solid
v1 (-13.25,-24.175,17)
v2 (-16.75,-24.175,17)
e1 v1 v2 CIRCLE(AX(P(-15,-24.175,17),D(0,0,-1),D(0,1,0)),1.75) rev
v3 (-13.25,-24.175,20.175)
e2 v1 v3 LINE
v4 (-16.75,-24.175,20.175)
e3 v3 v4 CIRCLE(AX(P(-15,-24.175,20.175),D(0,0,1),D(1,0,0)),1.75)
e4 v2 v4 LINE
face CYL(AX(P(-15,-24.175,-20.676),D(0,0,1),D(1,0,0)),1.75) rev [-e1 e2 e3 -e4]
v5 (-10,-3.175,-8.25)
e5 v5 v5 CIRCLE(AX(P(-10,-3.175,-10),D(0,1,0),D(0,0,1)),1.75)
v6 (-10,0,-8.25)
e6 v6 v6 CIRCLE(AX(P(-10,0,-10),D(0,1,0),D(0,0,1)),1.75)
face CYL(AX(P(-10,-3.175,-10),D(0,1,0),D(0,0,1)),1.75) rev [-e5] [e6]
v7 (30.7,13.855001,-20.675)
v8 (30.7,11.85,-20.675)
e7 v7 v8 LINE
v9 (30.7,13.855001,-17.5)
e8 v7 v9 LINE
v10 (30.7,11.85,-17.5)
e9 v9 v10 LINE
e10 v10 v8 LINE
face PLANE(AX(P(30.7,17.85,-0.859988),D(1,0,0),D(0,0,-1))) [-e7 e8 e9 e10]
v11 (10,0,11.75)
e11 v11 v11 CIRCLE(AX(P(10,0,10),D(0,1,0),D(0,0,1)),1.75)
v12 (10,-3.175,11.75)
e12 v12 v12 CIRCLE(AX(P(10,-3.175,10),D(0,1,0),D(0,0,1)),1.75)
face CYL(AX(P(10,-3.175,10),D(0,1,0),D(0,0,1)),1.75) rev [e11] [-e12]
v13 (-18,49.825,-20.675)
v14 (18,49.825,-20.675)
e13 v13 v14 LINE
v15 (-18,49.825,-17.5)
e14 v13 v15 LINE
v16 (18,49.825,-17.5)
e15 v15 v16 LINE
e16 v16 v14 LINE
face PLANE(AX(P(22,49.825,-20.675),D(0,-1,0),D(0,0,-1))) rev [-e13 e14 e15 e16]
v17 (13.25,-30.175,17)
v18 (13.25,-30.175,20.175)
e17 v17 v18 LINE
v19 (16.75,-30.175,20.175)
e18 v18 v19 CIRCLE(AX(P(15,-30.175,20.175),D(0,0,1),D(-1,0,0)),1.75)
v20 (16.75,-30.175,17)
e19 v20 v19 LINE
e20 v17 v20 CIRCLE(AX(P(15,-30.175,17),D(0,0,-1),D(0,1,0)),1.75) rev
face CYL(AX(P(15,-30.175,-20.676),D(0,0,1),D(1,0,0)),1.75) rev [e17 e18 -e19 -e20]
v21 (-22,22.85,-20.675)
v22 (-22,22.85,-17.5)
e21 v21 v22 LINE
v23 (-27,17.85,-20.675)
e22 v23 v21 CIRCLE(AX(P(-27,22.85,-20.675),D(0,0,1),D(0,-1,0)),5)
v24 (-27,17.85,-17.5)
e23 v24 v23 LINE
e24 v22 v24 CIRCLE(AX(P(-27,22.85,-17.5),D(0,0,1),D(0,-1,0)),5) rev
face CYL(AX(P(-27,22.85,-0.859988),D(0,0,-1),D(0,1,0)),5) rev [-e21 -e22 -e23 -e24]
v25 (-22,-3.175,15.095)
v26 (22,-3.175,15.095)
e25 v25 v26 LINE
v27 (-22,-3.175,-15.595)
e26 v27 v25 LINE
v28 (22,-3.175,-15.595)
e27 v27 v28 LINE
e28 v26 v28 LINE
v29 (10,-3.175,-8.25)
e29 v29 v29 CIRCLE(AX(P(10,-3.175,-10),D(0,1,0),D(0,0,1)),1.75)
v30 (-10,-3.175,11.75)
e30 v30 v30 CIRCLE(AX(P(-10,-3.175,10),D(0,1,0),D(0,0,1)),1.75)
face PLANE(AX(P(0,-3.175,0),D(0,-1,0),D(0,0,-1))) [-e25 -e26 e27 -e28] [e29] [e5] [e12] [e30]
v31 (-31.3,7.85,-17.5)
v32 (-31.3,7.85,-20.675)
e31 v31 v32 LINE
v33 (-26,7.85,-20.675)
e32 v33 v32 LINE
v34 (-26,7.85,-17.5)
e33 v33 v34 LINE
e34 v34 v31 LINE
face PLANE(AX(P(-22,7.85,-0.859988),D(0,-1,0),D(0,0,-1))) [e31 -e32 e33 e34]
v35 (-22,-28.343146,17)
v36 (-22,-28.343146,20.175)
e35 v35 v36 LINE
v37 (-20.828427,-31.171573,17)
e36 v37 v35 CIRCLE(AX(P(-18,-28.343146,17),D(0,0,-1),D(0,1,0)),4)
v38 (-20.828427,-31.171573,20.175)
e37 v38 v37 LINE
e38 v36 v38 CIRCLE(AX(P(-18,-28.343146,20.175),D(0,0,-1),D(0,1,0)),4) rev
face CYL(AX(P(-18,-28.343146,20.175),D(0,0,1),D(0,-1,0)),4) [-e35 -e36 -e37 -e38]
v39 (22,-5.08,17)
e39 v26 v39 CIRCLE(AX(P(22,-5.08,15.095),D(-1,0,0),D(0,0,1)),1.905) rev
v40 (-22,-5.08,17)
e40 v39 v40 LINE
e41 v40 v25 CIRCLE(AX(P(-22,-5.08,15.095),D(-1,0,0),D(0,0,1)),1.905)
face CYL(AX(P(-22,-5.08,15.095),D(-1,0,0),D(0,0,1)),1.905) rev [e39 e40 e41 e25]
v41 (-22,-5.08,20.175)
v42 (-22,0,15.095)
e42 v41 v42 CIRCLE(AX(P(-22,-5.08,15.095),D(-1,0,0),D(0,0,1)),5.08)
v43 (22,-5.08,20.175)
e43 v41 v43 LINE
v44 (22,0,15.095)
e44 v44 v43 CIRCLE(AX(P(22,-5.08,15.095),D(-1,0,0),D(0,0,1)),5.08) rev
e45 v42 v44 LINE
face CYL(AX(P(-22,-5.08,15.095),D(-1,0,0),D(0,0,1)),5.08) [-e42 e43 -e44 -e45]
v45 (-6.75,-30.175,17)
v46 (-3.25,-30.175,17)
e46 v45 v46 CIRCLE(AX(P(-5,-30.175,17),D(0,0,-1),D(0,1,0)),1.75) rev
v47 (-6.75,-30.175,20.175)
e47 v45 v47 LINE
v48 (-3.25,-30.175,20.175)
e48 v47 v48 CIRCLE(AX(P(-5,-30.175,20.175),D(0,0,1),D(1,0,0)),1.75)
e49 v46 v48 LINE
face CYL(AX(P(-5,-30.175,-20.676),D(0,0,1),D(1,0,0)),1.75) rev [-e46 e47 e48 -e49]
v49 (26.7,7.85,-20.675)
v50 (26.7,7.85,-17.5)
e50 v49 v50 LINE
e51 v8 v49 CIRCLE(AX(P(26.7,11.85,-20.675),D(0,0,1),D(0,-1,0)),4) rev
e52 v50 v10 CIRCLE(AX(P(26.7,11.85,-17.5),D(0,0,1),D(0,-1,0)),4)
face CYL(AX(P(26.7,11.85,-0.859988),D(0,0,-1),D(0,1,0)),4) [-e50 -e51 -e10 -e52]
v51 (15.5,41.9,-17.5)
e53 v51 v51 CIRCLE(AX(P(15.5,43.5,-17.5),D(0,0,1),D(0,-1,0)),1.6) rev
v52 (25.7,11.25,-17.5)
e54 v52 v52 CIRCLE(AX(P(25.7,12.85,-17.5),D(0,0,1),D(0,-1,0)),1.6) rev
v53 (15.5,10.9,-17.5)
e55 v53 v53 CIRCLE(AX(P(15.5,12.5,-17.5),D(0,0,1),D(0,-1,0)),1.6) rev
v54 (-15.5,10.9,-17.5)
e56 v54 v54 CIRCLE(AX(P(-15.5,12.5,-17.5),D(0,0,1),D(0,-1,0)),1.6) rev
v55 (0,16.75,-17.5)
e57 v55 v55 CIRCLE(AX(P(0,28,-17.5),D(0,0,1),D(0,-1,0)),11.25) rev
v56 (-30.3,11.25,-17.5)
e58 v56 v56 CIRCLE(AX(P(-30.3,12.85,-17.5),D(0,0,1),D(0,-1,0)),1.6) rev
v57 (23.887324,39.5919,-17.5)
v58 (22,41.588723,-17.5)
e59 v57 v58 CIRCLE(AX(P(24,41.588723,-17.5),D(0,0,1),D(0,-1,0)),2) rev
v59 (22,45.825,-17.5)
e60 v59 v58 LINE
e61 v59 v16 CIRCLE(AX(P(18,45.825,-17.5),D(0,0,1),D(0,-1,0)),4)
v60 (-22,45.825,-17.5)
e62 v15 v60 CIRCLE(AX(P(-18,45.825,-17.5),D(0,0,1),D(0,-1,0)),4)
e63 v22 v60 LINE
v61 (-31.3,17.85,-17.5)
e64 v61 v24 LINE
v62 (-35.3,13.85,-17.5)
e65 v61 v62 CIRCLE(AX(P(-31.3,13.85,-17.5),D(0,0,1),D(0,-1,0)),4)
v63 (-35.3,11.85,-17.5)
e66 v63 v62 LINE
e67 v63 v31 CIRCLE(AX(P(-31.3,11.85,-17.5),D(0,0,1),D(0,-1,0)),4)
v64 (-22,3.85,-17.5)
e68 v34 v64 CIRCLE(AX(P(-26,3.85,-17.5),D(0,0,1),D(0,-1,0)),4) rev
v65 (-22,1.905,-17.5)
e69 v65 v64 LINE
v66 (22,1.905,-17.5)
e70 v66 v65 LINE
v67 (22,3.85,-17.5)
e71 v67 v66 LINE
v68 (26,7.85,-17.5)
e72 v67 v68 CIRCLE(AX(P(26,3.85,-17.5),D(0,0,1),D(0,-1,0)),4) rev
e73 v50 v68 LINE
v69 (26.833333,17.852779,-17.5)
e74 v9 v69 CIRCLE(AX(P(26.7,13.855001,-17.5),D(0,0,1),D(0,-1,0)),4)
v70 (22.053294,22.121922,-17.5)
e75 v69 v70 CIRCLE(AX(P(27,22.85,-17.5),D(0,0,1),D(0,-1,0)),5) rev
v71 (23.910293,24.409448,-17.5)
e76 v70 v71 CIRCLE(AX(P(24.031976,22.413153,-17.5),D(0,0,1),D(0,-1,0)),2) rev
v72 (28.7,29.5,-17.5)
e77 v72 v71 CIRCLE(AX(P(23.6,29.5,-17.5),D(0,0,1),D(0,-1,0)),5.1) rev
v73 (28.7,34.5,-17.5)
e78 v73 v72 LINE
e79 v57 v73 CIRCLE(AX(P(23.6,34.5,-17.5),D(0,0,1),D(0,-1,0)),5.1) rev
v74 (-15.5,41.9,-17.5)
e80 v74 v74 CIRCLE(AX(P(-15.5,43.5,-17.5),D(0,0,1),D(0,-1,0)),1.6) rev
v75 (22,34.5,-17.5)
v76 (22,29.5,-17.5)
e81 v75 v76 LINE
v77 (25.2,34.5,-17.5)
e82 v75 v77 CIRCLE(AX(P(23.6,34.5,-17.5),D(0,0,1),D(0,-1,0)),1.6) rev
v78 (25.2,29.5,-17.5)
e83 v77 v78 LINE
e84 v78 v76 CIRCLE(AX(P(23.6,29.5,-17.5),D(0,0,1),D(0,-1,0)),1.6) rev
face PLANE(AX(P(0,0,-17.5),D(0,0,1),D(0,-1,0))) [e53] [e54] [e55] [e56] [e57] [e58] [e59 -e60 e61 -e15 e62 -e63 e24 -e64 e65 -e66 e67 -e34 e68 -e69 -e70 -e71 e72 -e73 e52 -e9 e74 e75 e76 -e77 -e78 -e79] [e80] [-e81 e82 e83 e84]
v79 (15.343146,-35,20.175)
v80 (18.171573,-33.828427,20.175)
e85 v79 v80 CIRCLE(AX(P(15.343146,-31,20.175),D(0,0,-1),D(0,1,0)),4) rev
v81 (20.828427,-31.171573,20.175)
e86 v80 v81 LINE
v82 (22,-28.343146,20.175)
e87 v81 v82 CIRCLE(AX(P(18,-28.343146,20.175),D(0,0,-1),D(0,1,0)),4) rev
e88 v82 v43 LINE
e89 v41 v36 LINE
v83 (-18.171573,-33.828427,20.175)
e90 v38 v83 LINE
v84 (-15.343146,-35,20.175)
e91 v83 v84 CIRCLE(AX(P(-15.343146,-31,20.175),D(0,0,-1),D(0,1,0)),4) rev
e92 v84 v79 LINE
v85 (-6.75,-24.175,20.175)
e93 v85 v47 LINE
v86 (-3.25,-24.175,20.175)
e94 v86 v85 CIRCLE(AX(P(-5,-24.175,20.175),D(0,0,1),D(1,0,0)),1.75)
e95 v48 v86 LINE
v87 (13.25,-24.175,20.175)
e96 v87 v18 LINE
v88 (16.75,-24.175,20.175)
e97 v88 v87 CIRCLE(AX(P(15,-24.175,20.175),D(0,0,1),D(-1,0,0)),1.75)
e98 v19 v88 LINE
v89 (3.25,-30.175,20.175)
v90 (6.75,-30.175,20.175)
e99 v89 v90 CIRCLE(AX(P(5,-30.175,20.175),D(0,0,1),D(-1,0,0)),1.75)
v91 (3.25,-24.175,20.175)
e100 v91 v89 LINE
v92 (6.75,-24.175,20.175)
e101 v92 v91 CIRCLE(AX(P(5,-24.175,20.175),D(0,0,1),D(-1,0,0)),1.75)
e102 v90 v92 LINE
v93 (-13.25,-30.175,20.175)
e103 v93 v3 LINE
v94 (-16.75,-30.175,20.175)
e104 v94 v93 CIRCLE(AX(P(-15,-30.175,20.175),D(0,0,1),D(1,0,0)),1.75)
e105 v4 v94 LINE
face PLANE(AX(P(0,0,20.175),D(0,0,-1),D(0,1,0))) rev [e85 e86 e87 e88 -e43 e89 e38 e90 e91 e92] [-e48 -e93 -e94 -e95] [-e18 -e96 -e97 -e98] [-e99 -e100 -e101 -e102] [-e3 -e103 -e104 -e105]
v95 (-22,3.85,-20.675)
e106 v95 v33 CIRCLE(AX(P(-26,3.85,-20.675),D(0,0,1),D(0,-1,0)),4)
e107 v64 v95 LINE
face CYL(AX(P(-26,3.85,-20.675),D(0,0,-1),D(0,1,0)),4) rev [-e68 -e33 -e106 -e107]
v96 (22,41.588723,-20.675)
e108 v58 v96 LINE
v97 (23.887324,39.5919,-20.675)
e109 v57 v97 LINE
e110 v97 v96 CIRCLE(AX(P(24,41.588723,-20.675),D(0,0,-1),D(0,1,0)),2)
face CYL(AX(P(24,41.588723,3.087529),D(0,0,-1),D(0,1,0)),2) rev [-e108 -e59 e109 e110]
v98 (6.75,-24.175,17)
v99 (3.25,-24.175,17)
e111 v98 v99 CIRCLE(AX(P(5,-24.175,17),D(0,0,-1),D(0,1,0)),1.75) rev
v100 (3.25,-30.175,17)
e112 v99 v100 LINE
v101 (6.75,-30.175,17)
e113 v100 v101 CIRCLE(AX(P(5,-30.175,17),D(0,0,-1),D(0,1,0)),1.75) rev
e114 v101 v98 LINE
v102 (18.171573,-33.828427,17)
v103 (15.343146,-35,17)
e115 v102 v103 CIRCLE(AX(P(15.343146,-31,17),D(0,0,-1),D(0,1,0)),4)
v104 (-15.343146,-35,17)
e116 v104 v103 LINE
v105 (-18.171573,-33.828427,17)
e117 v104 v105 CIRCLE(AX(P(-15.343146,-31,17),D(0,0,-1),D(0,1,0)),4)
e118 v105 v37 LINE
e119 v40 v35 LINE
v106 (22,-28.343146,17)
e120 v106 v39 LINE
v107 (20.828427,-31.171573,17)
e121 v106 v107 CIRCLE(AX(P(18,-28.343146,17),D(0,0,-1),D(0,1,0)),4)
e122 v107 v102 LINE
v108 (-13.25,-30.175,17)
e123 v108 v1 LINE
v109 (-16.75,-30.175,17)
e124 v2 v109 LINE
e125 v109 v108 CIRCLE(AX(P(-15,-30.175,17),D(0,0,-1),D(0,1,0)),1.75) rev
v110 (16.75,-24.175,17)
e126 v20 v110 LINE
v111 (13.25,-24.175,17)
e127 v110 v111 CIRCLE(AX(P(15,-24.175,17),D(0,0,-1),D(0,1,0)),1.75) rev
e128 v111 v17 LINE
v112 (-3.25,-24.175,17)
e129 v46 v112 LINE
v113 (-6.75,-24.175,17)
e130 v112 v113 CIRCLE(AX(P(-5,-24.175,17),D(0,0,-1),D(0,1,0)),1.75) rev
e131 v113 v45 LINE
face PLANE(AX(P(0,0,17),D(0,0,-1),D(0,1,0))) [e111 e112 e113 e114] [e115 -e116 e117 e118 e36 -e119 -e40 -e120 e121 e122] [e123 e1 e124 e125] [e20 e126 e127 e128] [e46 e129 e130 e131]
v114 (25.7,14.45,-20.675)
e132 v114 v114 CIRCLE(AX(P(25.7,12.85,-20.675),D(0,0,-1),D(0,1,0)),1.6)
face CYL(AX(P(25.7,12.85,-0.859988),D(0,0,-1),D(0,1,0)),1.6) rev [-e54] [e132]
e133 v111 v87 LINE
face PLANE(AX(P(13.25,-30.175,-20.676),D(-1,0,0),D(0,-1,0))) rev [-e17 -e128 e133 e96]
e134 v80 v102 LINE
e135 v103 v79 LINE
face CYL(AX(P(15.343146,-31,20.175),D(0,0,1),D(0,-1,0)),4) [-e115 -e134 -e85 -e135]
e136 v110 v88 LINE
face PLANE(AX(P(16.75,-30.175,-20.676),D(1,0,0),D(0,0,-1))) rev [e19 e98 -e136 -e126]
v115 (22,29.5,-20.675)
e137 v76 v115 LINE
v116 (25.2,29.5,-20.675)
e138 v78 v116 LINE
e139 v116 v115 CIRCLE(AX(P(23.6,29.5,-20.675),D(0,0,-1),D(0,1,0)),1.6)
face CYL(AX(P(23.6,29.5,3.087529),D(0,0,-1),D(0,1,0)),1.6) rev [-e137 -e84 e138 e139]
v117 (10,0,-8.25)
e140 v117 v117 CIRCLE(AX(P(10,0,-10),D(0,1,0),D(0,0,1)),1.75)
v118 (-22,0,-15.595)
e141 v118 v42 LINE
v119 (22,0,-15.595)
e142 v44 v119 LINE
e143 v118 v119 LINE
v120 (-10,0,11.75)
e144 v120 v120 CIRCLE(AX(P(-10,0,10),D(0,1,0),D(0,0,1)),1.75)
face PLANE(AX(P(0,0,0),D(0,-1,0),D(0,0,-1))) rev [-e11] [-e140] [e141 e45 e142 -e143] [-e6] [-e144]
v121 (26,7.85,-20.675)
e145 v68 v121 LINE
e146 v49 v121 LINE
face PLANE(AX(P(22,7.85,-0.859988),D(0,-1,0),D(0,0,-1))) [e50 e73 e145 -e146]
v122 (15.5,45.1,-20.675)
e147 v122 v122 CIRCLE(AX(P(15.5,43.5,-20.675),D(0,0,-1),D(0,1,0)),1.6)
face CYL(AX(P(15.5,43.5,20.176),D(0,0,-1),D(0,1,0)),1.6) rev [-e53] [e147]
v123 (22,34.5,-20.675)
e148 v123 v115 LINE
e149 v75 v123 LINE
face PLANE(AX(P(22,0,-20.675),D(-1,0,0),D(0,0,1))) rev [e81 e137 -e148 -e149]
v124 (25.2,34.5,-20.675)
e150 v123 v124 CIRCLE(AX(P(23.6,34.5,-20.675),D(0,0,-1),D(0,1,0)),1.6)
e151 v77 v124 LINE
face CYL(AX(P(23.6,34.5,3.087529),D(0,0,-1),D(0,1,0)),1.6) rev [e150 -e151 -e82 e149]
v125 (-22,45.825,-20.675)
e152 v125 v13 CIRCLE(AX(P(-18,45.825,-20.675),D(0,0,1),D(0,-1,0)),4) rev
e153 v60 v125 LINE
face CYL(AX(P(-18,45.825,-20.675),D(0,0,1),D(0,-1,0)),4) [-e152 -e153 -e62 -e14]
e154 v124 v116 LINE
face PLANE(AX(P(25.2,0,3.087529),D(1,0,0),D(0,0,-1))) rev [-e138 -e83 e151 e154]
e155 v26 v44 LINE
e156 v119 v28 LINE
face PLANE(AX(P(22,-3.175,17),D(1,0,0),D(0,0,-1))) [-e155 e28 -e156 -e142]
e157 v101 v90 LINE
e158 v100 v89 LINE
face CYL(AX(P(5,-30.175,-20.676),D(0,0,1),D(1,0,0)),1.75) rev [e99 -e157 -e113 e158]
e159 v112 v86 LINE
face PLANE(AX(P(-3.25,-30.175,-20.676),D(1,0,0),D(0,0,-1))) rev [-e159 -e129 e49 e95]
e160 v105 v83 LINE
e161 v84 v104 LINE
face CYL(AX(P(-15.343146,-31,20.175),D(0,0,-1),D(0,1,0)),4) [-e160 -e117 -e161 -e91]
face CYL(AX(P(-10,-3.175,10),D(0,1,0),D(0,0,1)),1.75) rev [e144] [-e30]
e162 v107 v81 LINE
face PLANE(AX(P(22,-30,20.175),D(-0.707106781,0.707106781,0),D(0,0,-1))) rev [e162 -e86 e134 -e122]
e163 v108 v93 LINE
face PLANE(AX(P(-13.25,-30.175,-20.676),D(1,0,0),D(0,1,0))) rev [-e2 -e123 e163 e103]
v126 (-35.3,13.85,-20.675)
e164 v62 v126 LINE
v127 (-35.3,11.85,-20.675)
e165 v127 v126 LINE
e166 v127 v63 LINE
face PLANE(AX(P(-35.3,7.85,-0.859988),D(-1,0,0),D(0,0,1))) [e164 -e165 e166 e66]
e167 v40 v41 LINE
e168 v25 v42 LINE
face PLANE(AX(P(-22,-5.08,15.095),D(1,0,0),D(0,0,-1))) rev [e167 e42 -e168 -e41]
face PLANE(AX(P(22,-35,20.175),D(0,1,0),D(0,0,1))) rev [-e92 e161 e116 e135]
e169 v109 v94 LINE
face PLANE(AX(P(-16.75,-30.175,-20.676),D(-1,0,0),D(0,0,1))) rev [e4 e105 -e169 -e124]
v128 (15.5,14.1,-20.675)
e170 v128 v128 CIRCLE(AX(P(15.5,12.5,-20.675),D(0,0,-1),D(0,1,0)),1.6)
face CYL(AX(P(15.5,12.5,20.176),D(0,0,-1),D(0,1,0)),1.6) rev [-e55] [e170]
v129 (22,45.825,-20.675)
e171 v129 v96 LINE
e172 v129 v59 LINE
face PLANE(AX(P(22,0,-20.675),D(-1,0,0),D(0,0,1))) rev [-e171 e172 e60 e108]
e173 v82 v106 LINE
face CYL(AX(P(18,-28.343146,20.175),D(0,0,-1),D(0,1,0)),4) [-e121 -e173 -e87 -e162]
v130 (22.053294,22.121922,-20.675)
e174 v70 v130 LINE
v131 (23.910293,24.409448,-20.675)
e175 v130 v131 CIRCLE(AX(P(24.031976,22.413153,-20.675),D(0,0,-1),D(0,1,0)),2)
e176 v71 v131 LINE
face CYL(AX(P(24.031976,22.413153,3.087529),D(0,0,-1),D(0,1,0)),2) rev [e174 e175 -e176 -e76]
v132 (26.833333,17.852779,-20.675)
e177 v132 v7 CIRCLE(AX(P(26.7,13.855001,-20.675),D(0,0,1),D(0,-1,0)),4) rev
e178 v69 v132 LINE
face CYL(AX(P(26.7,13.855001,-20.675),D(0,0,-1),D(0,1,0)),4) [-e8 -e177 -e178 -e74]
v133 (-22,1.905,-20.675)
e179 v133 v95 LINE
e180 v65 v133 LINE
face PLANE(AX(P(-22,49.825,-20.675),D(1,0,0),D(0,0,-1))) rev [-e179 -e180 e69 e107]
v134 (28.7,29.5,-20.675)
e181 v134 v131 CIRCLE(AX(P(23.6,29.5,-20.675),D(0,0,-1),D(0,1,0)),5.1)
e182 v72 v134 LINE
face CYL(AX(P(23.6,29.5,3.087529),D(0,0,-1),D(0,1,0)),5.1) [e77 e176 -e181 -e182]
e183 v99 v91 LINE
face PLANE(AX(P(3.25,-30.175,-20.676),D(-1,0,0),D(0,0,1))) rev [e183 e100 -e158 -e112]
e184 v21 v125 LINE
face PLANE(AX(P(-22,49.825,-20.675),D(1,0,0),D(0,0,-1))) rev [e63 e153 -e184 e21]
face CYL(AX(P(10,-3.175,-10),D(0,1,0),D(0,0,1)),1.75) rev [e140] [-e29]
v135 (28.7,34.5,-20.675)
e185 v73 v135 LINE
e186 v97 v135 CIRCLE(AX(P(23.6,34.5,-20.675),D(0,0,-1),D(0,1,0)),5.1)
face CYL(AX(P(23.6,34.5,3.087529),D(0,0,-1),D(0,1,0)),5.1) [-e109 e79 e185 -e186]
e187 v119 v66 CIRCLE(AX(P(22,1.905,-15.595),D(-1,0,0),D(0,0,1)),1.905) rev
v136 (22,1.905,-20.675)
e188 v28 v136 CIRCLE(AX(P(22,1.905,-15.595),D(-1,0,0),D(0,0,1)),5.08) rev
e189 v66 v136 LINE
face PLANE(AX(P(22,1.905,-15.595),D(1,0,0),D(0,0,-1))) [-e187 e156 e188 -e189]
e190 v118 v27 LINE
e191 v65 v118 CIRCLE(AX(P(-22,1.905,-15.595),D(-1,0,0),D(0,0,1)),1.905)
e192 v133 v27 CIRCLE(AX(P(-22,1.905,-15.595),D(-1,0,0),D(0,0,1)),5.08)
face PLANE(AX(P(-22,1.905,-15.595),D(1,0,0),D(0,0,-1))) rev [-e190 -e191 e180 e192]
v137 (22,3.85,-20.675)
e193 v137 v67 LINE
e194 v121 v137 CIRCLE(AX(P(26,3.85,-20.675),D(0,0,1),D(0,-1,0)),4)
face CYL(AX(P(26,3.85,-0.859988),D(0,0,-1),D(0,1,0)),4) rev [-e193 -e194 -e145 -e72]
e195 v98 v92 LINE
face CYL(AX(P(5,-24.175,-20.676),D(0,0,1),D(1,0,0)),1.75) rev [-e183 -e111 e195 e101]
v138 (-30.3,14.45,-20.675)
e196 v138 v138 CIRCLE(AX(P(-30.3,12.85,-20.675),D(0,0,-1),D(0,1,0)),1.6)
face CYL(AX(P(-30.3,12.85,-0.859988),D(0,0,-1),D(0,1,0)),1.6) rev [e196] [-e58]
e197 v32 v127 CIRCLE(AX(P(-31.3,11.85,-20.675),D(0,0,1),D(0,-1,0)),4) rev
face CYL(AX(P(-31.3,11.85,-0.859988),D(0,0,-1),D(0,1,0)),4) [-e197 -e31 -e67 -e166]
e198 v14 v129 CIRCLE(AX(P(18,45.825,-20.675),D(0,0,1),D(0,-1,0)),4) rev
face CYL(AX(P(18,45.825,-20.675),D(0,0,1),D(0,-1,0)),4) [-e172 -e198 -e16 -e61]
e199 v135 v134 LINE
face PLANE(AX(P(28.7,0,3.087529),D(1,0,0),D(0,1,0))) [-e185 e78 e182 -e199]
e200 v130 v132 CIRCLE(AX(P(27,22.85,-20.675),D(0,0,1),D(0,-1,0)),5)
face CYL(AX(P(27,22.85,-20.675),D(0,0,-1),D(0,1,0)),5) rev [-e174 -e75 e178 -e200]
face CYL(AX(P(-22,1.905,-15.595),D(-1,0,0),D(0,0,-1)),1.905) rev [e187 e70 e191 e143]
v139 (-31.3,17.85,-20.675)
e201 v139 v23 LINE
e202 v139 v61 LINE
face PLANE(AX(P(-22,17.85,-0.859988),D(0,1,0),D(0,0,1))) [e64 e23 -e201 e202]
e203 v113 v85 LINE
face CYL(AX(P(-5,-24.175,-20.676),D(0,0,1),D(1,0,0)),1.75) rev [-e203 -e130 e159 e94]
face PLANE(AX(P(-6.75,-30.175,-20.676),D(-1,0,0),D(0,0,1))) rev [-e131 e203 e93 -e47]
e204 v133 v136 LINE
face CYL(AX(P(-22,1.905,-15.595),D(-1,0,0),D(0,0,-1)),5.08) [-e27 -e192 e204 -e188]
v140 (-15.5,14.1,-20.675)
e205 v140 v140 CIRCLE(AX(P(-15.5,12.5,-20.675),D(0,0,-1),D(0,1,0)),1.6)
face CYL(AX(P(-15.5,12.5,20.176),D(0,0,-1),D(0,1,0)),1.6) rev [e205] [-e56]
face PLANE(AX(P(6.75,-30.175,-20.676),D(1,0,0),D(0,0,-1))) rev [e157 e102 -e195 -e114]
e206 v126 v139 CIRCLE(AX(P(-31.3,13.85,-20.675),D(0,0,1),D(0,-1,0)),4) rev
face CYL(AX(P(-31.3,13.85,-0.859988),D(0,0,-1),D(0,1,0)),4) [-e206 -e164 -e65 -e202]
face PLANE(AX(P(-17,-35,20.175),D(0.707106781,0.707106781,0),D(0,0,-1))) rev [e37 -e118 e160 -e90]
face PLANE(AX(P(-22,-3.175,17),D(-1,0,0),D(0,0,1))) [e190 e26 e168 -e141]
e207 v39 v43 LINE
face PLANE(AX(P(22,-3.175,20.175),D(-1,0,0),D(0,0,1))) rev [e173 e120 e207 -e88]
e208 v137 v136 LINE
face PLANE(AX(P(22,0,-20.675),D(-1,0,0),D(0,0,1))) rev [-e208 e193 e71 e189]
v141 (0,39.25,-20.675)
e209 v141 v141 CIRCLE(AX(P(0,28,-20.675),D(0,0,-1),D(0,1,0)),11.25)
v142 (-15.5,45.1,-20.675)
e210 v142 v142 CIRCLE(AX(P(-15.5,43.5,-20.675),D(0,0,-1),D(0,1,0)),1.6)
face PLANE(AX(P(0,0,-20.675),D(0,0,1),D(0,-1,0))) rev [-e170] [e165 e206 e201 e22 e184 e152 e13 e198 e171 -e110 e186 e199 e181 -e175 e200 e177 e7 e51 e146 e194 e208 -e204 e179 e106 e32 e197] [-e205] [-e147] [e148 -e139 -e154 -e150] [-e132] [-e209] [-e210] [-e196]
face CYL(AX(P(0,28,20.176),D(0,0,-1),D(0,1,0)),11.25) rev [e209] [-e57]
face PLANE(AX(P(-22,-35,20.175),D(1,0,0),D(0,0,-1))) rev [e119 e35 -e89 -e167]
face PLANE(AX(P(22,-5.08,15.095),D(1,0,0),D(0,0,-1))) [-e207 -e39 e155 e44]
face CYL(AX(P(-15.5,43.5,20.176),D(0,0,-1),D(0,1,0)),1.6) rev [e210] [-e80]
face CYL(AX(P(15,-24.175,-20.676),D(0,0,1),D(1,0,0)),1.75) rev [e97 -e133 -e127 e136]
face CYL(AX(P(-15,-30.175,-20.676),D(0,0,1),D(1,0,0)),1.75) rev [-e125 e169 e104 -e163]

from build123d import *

# Parameters (mm, degrees)
SKETCH1_W                    = 44
SKETCH1_H                    = 34.5
SKETCH1_R                    = 1.75
BASE_FLANGE1_DEPTH           = 3.175
EDGE_FLANGE1_STRIP_W         = 16.51
EDGE_FLANGE1_STRIP_H         = 3.175
EDGE_FLANGE1_STRIP_CUT_DEPTH = 44
EDGE_FLANGE1_DEPTH           = 44
EDGE_FLANGE2_STRIP_W         = 16.51
EDGE_FLANGE2_STRIP_H         = 3.175
EDGE_FLANGE2_STRIP_CUT_DEPTH = 44
EDGE_FLANGE2_DEPTH           = 44
CUT_EXTRUDE1_REACH           = 70.083
SKETCH12_R                   = 11.25
SKETCH12_R_2                 = 1.6
CUT_EXTRUDE2_REACH           = 70.083
CHAMFER1_SIZE                = 5
SKETCH14_W                   = 8.7
SKETCH14_H                   = 10
SKETCH14_R                   = 1.6
SKETCH14_W_2                 = 13.3
BOSS_EXTRUDE1_DEPTH          = 3.175
FILLET2_R                    = 5
FILLET3_R                    = 4
BOSS_EXTRUDE3_START          = -3.175
BOSS_EXTRUDE3_DEPTH          = 3.175


# Sheet-metal steps are written as plain solids
with BuildPart() as part:
    # Sketch1 → Base-Flange1 (new body)
    with BuildSketch(Plane(origin=(0, 0, 0), x_dir=(1, 0, 0), z_dir=(0, 1, 0))):
        with Locations((0, 0.25)):
            Rectangle(SKETCH1_W, SKETCH1_H)
        with Locations(Location((-10, 10, 0), (0, 0, 270))):
            Circle(SKETCH1_R, mode=Mode.SUBTRACT)
        with Locations(Location((10, 10, 0), (0, 0, 270))):
            Circle(SKETCH1_R, mode=Mode.SUBTRACT)
        with Locations(Location((10, -10, 0), (0, 0, 270))):
            Circle(SKETCH1_R, mode=Mode.SUBTRACT)
        with Locations(Location((-10, -10, 0), (0, 0, 270))):
            Circle(SKETCH1_R, mode=Mode.SUBTRACT)
    extrude(amount=-BASE_FLANGE1_DEPTH)

    # Edge-Flange1 strip (across the edge) → Edge-Flange1 strip cut (cut)
    with BuildSketch(Plane(origin=(22, 0, -17.5), x_dir=(0, 0, 1), z_dir=(-1, 0, 0))):
        with Locations((-6.35, -1.5875)):
            Rectangle(EDGE_FLANGE1_STRIP_W, EDGE_FLANGE1_STRIP_H)
    extrude(amount=EDGE_FLANGE1_STRIP_CUT_DEPTH, mode=Mode.SUBTRACT)

    # Edge-Flange1 section (across the edge) → Edge-Flange1 (add)
    with BuildSketch(Plane(origin=(22, 0, -17.5), x_dir=(0, 0, 1), z_dir=(-1, 0, 0))):
        with BuildLine():
            Line((-3.175, 1.905), (-3.175, 49.825))
            Line((-3.175, 49.825), (0, 49.825))
            Line((0, 49.825), (0, 1.905))
            ThreePointArc((0, 1.905), (0.557961582, 0.557961582), (1.905, 0))
            Line((1.905, 0), (1.905, -3.175))
            ThreePointArc((1.905, -3.175), (-1.687102448, -1.687102448), (-3.175, 1.905))
        make_face()
    extrude(amount=EDGE_FLANGE1_DEPTH)

    # Edge-Flange2 strip (across the edge) → Edge-Flange2 strip cut (cut)
    with BuildSketch(Plane(origin=(22, -3.175, 17), x_dir=(0, 0, -1), z_dir=(-1, 0, 0))):
        with Locations((-6.35, -1.5875)):
            Rectangle(EDGE_FLANGE2_STRIP_W, EDGE_FLANGE2_STRIP_H)
    extrude(amount=EDGE_FLANGE2_STRIP_CUT_DEPTH, mode=Mode.SUBTRACT)

    # Edge-Flange2 section (across the edge) → Edge-Flange2 (add)
    with BuildSketch(Plane(origin=(22, -3.175, 17), x_dir=(0, 0, -1), z_dir=(-1, 0, 0))):
        with BuildLine():
            Line((-3.175, 1.905), (-3.175, 31.825))
            Line((-3.175, 31.825), (0, 31.825))
            Line((0, 31.825), (0, 1.905))
            ThreePointArc((0, 1.905), (0.557961582, 0.557961582), (1.905, 0))
            Line((1.905, 0), (1.905, -3.175))
            ThreePointArc((1.905, -3.175), (-1.687102448, -1.687102448), (-3.175, 1.905))
        make_face()
    extrude(amount=EDGE_FLANGE2_DEPTH)

    # Sketch12 → Cut-Extrude1 (cut, up to next)
    with BuildSketch(Plane(origin=(0, 0, -20.675), x_dir=(-1, 0, 0), z_dir=(0, 0, -1)), mode=Mode.PRIVATE) as cut_extrude1_sk1:
        with Locations(Location((0, 28, 0), (0, 0, 90))):
            Circle(SKETCH12_R)
    cut_extrude1_tool1 = extrude(cut_extrude1_sk1.sketch, amount=-CUT_EXTRUDE1_REACH, mode=Mode.PRIVATE) & part.part
    # Sketch12 → Cut-Extrude1 (cut, up to next)
    with BuildSketch(Plane(origin=(0, 0, -20.675), x_dir=(-1, 0, 0), z_dir=(0, 0, -1)), mode=Mode.PRIVATE) as cut_extrude1_sk2:
        with Locations(Location((15.5, 43.5, 0), (0, 0, 90))):
            Circle(SKETCH12_R_2)
    cut_extrude1_tool2 = extrude(cut_extrude1_sk2.sketch, amount=-CUT_EXTRUDE1_REACH, mode=Mode.PRIVATE) & part.part
    # Sketch12 → Cut-Extrude1 (cut, up to next)
    with BuildSketch(Plane(origin=(0, 0, -20.675), x_dir=(-1, 0, 0), z_dir=(0, 0, -1)), mode=Mode.PRIVATE) as cut_extrude1_sk3:
        with Locations(Location((15.5, 12.5, 0), (0, 0, 90))):
            Circle(SKETCH12_R_2)
    cut_extrude1_tool3 = extrude(cut_extrude1_sk3.sketch, amount=-CUT_EXTRUDE1_REACH, mode=Mode.PRIVATE) & part.part
    # Sketch12 → Cut-Extrude1 (cut, up to next)
    with BuildSketch(Plane(origin=(0, 0, -20.675), x_dir=(-1, 0, 0), z_dir=(0, 0, -1)), mode=Mode.PRIVATE) as cut_extrude1_sk4:
        with Locations(Location((-15.5, 12.5, 0), (0, 0, 90))):
            Circle(SKETCH12_R_2)
    cut_extrude1_tool4 = extrude(cut_extrude1_sk4.sketch, amount=-CUT_EXTRUDE1_REACH, mode=Mode.PRIVATE) & part.part
    # Sketch12 → Cut-Extrude1 (cut, up to next)
    with BuildSketch(Plane(origin=(0, 0, -20.675), x_dir=(-1, 0, 0), z_dir=(0, 0, -1)), mode=Mode.PRIVATE) as cut_extrude1_sk5:
        with Locations(Location((-15.5, 43.5, 0), (0, 0, 90))):
            Circle(SKETCH12_R_2)
    cut_extrude1_tool5 = extrude(cut_extrude1_sk5.sketch, amount=-CUT_EXTRUDE1_REACH, mode=Mode.PRIVATE) & part.part
    add(cut_extrude1_tool1.solids().sort_by_distance((0, 28, -20.675))[0], mode=Mode.SUBTRACT)
    add(cut_extrude1_tool2.solids().sort_by_distance((-15.5, 43.5, -20.675))[0], mode=Mode.SUBTRACT)
    add(cut_extrude1_tool3.solids().sort_by_distance((-15.5, 12.5, -20.675))[0], mode=Mode.SUBTRACT)
    add(cut_extrude1_tool4.solids().sort_by_distance((15.5, 12.5, -20.675))[0], mode=Mode.SUBTRACT)
    add(cut_extrude1_tool5.solids().sort_by_distance((15.5, 43.5, -20.675))[0], mode=Mode.SUBTRACT)

    # Sketch13 → Cut-Extrude2 (cut, up to next)
    with BuildSketch(Plane.XY.offset(20.175), mode=Mode.PRIVATE) as cut_extrude2_sk1:
        with BuildLine():
            Line((-6.75, -30.175), (-6.75, -24.175))
            ThreePointArc((-6.75, -24.175), (-5, -22.425), (-3.25, -24.175))
            Line((-3.25, -24.175), (-3.25, -30.175))
            ThreePointArc((-3.25, -30.175), (-5, -31.925), (-6.75, -30.175))
        make_face()
    cut_extrude2_tool1 = extrude(cut_extrude2_sk1.sketch, amount=-CUT_EXTRUDE2_REACH, mode=Mode.PRIVATE) & part.part
    # Sketch13 → Cut-Extrude2 (cut, up to next)
    with BuildSketch(Plane.XY.offset(20.175), mode=Mode.PRIVATE) as cut_extrude2_sk2:
        with BuildLine():
            Line((-16.75, -30.175), (-16.75, -24.175))
            ThreePointArc((-16.75, -24.175), (-15, -22.425), (-13.25, -24.175))
            Line((-13.25, -24.175), (-13.25, -30.175))
            ThreePointArc((-13.25, -30.175), (-15, -31.925), (-16.75, -30.175))
        make_face()
    cut_extrude2_tool2 = extrude(cut_extrude2_sk2.sketch, amount=-CUT_EXTRUDE2_REACH, mode=Mode.PRIVATE) & part.part
    # Sketch13 → Cut-Extrude2 (cut, up to next)
    with BuildSketch(Plane.XY.offset(20.175), mode=Mode.PRIVATE) as cut_extrude2_sk3:
        with BuildLine():
            Line((16.75, -30.175), (16.75, -24.175))
            ThreePointArc((16.75, -24.175), (15, -22.425), (13.25, -24.175))
            Line((13.25, -24.175), (13.25, -30.175))
            ThreePointArc((13.25, -30.175), (15, -31.925), (16.75, -30.175))
        make_face()
    cut_extrude2_tool3 = extrude(cut_extrude2_sk3.sketch, amount=-CUT_EXTRUDE2_REACH, mode=Mode.PRIVATE) & part.part
    # Sketch13 → Cut-Extrude2 (cut, up to next)
    with BuildSketch(Plane.XY.offset(20.175), mode=Mode.PRIVATE) as cut_extrude2_sk4:
        with BuildLine():
            Line((6.75, -30.175), (6.75, -24.175))
            ThreePointArc((6.75, -24.175), (5, -22.425), (3.25, -24.175))
            Line((3.25, -24.175), (3.25, -30.175))
            ThreePointArc((3.25, -30.175), (5, -31.925), (6.75, -30.175))
        make_face()
    cut_extrude2_tool4 = extrude(cut_extrude2_sk4.sketch, amount=-CUT_EXTRUDE2_REACH, mode=Mode.PRIVATE) & part.part
    add(cut_extrude2_tool1.solids().sort_by_distance((-5, -27.175, 20.175))[0], mode=Mode.SUBTRACT)
    add(cut_extrude2_tool2.solids().sort_by_distance((-15, -27.175, 20.175))[0], mode=Mode.SUBTRACT)
    add(cut_extrude2_tool3.solids().sort_by_distance((15, -27.175, 20.175))[0], mode=Mode.SUBTRACT)
    add(cut_extrude2_tool4.solids().sort_by_distance((5, -27.175, 20.175))[0], mode=Mode.SUBTRACT)

    # Chamfer1
    chamfer1_edges = [part.edges().sort_by_distance(p)[0] for p in [
        (22, -35, 18.5875),
        (-22, -35, 18.5875),
    ]]
    chamfer(chamfer1_edges, length=CHAMFER1_SIZE)

    # Sketch14 → Boss-Extrude1 (add)
    # profile 1 of 2: a face of its own
    with BuildSketch(Plane(origin=(0, 0, -20.675), x_dir=(-1, 0, 0), z_dir=(0, 0, -1))):
        with Locations((-26.35, 12.85)):
            Rectangle(SKETCH14_W, SKETCH14_H)
        with Locations(Location((-25.7, 12.85, 0), (0, 0, 90))):
            Circle(SKETCH14_R, mode=Mode.SUBTRACT)
    # profile 2 of 2: a face of its own
    with BuildSketch(Plane(origin=(0, 0, -20.675), x_dir=(-1, 0, 0), z_dir=(0, 0, -1))):
        with Locations((28.65, 12.85)):
            Rectangle(SKETCH14_W_2, SKETCH14_H)
        with Locations(Location((30.3, 12.85, 0), (0, 0, 90))):
            Circle(SKETCH14_R, mode=Mode.SUBTRACT)
    extrude(amount=-BOSS_EXTRUDE1_DEPTH)

    # Fillet2
    fillet2_edges = [part.edges().sort_by_distance(p)[0] for p in [
        (-22, 17.85, -19.0875),
        (22, 17.85, -19.0875),
    ]]
    fillet(fillet2_edges, radius=FILLET2_R)

    # Fillet3
    fillet3_edges = [part.edges().sort_by_distance(p)[0] for p in [
        (-35.3, 7.85, -19.0875),
        (-35.3, 17.85, -19.0875),
        (30.7, 7.85, -19.0875),
        (30.7, 17.85, -19.0875),
        (-22, 49.825, -19.0875),
        (22, 49.825, -19.0875),
        (-22, 7.85, -19.0875),
        (22, 7.85, -19.0875),
        (-22, -30, 18.5875),
        (-17, -35, 18.5875),
        (17, -35, 18.5875),
        (22, -30, 18.5875),
    ]]
    fillet(fillet3_edges, radius=FILLET3_R)

    # Sketch19 → Boss-Extrude3 (add)
    with BuildSketch(Plane(origin=(0, 0, -20.675), x_dir=(-1, 0, 0), z_dir=(0, 0, -1)).offset(BOSS_EXTRUDE3_START)):
        with BuildLine():
            ThreePointArc((-25.2, 34.5), (-23.6, 36.1), (-22, 34.5))
            Line((-22, 34.5), (-22, 41.588723439))
            ThreePointArc((-22, 41.588723439), (-22.546495251, 40.214924348), (-23.887323944, 39.591899935))
            ThreePointArc((-23.887323944, 39.591899935), (-27.306437111, 38.003187683), (-28.7, 34.5))
            Line((-28.7, 34.5), (-28.7, 29.5))
            ThreePointArc((-28.7, 29.5), (-27.314329906, 26.005181929), (-23.910292804, 24.409448127))
            ThreePointArc((-23.910292804, 24.409448127), (-22.479211599, 23.673677736), (-22.053293762, 22.121922124))
            ThreePointArc((-22.053293762, 22.121922124), (-22.013341239, 22.484987117), (-22, 22.85))
            Line((-22, 22.85), (-22, 29.5))
            ThreePointArc((-22, 29.5), (-23.6, 27.9), (-25.2, 29.5))
            Line((-25.2, 29.5), (-25.2, 34.5))
        make_face()
    extrude(amount=BOSS_EXTRUDE3_DEPTH)


solid = part.part
